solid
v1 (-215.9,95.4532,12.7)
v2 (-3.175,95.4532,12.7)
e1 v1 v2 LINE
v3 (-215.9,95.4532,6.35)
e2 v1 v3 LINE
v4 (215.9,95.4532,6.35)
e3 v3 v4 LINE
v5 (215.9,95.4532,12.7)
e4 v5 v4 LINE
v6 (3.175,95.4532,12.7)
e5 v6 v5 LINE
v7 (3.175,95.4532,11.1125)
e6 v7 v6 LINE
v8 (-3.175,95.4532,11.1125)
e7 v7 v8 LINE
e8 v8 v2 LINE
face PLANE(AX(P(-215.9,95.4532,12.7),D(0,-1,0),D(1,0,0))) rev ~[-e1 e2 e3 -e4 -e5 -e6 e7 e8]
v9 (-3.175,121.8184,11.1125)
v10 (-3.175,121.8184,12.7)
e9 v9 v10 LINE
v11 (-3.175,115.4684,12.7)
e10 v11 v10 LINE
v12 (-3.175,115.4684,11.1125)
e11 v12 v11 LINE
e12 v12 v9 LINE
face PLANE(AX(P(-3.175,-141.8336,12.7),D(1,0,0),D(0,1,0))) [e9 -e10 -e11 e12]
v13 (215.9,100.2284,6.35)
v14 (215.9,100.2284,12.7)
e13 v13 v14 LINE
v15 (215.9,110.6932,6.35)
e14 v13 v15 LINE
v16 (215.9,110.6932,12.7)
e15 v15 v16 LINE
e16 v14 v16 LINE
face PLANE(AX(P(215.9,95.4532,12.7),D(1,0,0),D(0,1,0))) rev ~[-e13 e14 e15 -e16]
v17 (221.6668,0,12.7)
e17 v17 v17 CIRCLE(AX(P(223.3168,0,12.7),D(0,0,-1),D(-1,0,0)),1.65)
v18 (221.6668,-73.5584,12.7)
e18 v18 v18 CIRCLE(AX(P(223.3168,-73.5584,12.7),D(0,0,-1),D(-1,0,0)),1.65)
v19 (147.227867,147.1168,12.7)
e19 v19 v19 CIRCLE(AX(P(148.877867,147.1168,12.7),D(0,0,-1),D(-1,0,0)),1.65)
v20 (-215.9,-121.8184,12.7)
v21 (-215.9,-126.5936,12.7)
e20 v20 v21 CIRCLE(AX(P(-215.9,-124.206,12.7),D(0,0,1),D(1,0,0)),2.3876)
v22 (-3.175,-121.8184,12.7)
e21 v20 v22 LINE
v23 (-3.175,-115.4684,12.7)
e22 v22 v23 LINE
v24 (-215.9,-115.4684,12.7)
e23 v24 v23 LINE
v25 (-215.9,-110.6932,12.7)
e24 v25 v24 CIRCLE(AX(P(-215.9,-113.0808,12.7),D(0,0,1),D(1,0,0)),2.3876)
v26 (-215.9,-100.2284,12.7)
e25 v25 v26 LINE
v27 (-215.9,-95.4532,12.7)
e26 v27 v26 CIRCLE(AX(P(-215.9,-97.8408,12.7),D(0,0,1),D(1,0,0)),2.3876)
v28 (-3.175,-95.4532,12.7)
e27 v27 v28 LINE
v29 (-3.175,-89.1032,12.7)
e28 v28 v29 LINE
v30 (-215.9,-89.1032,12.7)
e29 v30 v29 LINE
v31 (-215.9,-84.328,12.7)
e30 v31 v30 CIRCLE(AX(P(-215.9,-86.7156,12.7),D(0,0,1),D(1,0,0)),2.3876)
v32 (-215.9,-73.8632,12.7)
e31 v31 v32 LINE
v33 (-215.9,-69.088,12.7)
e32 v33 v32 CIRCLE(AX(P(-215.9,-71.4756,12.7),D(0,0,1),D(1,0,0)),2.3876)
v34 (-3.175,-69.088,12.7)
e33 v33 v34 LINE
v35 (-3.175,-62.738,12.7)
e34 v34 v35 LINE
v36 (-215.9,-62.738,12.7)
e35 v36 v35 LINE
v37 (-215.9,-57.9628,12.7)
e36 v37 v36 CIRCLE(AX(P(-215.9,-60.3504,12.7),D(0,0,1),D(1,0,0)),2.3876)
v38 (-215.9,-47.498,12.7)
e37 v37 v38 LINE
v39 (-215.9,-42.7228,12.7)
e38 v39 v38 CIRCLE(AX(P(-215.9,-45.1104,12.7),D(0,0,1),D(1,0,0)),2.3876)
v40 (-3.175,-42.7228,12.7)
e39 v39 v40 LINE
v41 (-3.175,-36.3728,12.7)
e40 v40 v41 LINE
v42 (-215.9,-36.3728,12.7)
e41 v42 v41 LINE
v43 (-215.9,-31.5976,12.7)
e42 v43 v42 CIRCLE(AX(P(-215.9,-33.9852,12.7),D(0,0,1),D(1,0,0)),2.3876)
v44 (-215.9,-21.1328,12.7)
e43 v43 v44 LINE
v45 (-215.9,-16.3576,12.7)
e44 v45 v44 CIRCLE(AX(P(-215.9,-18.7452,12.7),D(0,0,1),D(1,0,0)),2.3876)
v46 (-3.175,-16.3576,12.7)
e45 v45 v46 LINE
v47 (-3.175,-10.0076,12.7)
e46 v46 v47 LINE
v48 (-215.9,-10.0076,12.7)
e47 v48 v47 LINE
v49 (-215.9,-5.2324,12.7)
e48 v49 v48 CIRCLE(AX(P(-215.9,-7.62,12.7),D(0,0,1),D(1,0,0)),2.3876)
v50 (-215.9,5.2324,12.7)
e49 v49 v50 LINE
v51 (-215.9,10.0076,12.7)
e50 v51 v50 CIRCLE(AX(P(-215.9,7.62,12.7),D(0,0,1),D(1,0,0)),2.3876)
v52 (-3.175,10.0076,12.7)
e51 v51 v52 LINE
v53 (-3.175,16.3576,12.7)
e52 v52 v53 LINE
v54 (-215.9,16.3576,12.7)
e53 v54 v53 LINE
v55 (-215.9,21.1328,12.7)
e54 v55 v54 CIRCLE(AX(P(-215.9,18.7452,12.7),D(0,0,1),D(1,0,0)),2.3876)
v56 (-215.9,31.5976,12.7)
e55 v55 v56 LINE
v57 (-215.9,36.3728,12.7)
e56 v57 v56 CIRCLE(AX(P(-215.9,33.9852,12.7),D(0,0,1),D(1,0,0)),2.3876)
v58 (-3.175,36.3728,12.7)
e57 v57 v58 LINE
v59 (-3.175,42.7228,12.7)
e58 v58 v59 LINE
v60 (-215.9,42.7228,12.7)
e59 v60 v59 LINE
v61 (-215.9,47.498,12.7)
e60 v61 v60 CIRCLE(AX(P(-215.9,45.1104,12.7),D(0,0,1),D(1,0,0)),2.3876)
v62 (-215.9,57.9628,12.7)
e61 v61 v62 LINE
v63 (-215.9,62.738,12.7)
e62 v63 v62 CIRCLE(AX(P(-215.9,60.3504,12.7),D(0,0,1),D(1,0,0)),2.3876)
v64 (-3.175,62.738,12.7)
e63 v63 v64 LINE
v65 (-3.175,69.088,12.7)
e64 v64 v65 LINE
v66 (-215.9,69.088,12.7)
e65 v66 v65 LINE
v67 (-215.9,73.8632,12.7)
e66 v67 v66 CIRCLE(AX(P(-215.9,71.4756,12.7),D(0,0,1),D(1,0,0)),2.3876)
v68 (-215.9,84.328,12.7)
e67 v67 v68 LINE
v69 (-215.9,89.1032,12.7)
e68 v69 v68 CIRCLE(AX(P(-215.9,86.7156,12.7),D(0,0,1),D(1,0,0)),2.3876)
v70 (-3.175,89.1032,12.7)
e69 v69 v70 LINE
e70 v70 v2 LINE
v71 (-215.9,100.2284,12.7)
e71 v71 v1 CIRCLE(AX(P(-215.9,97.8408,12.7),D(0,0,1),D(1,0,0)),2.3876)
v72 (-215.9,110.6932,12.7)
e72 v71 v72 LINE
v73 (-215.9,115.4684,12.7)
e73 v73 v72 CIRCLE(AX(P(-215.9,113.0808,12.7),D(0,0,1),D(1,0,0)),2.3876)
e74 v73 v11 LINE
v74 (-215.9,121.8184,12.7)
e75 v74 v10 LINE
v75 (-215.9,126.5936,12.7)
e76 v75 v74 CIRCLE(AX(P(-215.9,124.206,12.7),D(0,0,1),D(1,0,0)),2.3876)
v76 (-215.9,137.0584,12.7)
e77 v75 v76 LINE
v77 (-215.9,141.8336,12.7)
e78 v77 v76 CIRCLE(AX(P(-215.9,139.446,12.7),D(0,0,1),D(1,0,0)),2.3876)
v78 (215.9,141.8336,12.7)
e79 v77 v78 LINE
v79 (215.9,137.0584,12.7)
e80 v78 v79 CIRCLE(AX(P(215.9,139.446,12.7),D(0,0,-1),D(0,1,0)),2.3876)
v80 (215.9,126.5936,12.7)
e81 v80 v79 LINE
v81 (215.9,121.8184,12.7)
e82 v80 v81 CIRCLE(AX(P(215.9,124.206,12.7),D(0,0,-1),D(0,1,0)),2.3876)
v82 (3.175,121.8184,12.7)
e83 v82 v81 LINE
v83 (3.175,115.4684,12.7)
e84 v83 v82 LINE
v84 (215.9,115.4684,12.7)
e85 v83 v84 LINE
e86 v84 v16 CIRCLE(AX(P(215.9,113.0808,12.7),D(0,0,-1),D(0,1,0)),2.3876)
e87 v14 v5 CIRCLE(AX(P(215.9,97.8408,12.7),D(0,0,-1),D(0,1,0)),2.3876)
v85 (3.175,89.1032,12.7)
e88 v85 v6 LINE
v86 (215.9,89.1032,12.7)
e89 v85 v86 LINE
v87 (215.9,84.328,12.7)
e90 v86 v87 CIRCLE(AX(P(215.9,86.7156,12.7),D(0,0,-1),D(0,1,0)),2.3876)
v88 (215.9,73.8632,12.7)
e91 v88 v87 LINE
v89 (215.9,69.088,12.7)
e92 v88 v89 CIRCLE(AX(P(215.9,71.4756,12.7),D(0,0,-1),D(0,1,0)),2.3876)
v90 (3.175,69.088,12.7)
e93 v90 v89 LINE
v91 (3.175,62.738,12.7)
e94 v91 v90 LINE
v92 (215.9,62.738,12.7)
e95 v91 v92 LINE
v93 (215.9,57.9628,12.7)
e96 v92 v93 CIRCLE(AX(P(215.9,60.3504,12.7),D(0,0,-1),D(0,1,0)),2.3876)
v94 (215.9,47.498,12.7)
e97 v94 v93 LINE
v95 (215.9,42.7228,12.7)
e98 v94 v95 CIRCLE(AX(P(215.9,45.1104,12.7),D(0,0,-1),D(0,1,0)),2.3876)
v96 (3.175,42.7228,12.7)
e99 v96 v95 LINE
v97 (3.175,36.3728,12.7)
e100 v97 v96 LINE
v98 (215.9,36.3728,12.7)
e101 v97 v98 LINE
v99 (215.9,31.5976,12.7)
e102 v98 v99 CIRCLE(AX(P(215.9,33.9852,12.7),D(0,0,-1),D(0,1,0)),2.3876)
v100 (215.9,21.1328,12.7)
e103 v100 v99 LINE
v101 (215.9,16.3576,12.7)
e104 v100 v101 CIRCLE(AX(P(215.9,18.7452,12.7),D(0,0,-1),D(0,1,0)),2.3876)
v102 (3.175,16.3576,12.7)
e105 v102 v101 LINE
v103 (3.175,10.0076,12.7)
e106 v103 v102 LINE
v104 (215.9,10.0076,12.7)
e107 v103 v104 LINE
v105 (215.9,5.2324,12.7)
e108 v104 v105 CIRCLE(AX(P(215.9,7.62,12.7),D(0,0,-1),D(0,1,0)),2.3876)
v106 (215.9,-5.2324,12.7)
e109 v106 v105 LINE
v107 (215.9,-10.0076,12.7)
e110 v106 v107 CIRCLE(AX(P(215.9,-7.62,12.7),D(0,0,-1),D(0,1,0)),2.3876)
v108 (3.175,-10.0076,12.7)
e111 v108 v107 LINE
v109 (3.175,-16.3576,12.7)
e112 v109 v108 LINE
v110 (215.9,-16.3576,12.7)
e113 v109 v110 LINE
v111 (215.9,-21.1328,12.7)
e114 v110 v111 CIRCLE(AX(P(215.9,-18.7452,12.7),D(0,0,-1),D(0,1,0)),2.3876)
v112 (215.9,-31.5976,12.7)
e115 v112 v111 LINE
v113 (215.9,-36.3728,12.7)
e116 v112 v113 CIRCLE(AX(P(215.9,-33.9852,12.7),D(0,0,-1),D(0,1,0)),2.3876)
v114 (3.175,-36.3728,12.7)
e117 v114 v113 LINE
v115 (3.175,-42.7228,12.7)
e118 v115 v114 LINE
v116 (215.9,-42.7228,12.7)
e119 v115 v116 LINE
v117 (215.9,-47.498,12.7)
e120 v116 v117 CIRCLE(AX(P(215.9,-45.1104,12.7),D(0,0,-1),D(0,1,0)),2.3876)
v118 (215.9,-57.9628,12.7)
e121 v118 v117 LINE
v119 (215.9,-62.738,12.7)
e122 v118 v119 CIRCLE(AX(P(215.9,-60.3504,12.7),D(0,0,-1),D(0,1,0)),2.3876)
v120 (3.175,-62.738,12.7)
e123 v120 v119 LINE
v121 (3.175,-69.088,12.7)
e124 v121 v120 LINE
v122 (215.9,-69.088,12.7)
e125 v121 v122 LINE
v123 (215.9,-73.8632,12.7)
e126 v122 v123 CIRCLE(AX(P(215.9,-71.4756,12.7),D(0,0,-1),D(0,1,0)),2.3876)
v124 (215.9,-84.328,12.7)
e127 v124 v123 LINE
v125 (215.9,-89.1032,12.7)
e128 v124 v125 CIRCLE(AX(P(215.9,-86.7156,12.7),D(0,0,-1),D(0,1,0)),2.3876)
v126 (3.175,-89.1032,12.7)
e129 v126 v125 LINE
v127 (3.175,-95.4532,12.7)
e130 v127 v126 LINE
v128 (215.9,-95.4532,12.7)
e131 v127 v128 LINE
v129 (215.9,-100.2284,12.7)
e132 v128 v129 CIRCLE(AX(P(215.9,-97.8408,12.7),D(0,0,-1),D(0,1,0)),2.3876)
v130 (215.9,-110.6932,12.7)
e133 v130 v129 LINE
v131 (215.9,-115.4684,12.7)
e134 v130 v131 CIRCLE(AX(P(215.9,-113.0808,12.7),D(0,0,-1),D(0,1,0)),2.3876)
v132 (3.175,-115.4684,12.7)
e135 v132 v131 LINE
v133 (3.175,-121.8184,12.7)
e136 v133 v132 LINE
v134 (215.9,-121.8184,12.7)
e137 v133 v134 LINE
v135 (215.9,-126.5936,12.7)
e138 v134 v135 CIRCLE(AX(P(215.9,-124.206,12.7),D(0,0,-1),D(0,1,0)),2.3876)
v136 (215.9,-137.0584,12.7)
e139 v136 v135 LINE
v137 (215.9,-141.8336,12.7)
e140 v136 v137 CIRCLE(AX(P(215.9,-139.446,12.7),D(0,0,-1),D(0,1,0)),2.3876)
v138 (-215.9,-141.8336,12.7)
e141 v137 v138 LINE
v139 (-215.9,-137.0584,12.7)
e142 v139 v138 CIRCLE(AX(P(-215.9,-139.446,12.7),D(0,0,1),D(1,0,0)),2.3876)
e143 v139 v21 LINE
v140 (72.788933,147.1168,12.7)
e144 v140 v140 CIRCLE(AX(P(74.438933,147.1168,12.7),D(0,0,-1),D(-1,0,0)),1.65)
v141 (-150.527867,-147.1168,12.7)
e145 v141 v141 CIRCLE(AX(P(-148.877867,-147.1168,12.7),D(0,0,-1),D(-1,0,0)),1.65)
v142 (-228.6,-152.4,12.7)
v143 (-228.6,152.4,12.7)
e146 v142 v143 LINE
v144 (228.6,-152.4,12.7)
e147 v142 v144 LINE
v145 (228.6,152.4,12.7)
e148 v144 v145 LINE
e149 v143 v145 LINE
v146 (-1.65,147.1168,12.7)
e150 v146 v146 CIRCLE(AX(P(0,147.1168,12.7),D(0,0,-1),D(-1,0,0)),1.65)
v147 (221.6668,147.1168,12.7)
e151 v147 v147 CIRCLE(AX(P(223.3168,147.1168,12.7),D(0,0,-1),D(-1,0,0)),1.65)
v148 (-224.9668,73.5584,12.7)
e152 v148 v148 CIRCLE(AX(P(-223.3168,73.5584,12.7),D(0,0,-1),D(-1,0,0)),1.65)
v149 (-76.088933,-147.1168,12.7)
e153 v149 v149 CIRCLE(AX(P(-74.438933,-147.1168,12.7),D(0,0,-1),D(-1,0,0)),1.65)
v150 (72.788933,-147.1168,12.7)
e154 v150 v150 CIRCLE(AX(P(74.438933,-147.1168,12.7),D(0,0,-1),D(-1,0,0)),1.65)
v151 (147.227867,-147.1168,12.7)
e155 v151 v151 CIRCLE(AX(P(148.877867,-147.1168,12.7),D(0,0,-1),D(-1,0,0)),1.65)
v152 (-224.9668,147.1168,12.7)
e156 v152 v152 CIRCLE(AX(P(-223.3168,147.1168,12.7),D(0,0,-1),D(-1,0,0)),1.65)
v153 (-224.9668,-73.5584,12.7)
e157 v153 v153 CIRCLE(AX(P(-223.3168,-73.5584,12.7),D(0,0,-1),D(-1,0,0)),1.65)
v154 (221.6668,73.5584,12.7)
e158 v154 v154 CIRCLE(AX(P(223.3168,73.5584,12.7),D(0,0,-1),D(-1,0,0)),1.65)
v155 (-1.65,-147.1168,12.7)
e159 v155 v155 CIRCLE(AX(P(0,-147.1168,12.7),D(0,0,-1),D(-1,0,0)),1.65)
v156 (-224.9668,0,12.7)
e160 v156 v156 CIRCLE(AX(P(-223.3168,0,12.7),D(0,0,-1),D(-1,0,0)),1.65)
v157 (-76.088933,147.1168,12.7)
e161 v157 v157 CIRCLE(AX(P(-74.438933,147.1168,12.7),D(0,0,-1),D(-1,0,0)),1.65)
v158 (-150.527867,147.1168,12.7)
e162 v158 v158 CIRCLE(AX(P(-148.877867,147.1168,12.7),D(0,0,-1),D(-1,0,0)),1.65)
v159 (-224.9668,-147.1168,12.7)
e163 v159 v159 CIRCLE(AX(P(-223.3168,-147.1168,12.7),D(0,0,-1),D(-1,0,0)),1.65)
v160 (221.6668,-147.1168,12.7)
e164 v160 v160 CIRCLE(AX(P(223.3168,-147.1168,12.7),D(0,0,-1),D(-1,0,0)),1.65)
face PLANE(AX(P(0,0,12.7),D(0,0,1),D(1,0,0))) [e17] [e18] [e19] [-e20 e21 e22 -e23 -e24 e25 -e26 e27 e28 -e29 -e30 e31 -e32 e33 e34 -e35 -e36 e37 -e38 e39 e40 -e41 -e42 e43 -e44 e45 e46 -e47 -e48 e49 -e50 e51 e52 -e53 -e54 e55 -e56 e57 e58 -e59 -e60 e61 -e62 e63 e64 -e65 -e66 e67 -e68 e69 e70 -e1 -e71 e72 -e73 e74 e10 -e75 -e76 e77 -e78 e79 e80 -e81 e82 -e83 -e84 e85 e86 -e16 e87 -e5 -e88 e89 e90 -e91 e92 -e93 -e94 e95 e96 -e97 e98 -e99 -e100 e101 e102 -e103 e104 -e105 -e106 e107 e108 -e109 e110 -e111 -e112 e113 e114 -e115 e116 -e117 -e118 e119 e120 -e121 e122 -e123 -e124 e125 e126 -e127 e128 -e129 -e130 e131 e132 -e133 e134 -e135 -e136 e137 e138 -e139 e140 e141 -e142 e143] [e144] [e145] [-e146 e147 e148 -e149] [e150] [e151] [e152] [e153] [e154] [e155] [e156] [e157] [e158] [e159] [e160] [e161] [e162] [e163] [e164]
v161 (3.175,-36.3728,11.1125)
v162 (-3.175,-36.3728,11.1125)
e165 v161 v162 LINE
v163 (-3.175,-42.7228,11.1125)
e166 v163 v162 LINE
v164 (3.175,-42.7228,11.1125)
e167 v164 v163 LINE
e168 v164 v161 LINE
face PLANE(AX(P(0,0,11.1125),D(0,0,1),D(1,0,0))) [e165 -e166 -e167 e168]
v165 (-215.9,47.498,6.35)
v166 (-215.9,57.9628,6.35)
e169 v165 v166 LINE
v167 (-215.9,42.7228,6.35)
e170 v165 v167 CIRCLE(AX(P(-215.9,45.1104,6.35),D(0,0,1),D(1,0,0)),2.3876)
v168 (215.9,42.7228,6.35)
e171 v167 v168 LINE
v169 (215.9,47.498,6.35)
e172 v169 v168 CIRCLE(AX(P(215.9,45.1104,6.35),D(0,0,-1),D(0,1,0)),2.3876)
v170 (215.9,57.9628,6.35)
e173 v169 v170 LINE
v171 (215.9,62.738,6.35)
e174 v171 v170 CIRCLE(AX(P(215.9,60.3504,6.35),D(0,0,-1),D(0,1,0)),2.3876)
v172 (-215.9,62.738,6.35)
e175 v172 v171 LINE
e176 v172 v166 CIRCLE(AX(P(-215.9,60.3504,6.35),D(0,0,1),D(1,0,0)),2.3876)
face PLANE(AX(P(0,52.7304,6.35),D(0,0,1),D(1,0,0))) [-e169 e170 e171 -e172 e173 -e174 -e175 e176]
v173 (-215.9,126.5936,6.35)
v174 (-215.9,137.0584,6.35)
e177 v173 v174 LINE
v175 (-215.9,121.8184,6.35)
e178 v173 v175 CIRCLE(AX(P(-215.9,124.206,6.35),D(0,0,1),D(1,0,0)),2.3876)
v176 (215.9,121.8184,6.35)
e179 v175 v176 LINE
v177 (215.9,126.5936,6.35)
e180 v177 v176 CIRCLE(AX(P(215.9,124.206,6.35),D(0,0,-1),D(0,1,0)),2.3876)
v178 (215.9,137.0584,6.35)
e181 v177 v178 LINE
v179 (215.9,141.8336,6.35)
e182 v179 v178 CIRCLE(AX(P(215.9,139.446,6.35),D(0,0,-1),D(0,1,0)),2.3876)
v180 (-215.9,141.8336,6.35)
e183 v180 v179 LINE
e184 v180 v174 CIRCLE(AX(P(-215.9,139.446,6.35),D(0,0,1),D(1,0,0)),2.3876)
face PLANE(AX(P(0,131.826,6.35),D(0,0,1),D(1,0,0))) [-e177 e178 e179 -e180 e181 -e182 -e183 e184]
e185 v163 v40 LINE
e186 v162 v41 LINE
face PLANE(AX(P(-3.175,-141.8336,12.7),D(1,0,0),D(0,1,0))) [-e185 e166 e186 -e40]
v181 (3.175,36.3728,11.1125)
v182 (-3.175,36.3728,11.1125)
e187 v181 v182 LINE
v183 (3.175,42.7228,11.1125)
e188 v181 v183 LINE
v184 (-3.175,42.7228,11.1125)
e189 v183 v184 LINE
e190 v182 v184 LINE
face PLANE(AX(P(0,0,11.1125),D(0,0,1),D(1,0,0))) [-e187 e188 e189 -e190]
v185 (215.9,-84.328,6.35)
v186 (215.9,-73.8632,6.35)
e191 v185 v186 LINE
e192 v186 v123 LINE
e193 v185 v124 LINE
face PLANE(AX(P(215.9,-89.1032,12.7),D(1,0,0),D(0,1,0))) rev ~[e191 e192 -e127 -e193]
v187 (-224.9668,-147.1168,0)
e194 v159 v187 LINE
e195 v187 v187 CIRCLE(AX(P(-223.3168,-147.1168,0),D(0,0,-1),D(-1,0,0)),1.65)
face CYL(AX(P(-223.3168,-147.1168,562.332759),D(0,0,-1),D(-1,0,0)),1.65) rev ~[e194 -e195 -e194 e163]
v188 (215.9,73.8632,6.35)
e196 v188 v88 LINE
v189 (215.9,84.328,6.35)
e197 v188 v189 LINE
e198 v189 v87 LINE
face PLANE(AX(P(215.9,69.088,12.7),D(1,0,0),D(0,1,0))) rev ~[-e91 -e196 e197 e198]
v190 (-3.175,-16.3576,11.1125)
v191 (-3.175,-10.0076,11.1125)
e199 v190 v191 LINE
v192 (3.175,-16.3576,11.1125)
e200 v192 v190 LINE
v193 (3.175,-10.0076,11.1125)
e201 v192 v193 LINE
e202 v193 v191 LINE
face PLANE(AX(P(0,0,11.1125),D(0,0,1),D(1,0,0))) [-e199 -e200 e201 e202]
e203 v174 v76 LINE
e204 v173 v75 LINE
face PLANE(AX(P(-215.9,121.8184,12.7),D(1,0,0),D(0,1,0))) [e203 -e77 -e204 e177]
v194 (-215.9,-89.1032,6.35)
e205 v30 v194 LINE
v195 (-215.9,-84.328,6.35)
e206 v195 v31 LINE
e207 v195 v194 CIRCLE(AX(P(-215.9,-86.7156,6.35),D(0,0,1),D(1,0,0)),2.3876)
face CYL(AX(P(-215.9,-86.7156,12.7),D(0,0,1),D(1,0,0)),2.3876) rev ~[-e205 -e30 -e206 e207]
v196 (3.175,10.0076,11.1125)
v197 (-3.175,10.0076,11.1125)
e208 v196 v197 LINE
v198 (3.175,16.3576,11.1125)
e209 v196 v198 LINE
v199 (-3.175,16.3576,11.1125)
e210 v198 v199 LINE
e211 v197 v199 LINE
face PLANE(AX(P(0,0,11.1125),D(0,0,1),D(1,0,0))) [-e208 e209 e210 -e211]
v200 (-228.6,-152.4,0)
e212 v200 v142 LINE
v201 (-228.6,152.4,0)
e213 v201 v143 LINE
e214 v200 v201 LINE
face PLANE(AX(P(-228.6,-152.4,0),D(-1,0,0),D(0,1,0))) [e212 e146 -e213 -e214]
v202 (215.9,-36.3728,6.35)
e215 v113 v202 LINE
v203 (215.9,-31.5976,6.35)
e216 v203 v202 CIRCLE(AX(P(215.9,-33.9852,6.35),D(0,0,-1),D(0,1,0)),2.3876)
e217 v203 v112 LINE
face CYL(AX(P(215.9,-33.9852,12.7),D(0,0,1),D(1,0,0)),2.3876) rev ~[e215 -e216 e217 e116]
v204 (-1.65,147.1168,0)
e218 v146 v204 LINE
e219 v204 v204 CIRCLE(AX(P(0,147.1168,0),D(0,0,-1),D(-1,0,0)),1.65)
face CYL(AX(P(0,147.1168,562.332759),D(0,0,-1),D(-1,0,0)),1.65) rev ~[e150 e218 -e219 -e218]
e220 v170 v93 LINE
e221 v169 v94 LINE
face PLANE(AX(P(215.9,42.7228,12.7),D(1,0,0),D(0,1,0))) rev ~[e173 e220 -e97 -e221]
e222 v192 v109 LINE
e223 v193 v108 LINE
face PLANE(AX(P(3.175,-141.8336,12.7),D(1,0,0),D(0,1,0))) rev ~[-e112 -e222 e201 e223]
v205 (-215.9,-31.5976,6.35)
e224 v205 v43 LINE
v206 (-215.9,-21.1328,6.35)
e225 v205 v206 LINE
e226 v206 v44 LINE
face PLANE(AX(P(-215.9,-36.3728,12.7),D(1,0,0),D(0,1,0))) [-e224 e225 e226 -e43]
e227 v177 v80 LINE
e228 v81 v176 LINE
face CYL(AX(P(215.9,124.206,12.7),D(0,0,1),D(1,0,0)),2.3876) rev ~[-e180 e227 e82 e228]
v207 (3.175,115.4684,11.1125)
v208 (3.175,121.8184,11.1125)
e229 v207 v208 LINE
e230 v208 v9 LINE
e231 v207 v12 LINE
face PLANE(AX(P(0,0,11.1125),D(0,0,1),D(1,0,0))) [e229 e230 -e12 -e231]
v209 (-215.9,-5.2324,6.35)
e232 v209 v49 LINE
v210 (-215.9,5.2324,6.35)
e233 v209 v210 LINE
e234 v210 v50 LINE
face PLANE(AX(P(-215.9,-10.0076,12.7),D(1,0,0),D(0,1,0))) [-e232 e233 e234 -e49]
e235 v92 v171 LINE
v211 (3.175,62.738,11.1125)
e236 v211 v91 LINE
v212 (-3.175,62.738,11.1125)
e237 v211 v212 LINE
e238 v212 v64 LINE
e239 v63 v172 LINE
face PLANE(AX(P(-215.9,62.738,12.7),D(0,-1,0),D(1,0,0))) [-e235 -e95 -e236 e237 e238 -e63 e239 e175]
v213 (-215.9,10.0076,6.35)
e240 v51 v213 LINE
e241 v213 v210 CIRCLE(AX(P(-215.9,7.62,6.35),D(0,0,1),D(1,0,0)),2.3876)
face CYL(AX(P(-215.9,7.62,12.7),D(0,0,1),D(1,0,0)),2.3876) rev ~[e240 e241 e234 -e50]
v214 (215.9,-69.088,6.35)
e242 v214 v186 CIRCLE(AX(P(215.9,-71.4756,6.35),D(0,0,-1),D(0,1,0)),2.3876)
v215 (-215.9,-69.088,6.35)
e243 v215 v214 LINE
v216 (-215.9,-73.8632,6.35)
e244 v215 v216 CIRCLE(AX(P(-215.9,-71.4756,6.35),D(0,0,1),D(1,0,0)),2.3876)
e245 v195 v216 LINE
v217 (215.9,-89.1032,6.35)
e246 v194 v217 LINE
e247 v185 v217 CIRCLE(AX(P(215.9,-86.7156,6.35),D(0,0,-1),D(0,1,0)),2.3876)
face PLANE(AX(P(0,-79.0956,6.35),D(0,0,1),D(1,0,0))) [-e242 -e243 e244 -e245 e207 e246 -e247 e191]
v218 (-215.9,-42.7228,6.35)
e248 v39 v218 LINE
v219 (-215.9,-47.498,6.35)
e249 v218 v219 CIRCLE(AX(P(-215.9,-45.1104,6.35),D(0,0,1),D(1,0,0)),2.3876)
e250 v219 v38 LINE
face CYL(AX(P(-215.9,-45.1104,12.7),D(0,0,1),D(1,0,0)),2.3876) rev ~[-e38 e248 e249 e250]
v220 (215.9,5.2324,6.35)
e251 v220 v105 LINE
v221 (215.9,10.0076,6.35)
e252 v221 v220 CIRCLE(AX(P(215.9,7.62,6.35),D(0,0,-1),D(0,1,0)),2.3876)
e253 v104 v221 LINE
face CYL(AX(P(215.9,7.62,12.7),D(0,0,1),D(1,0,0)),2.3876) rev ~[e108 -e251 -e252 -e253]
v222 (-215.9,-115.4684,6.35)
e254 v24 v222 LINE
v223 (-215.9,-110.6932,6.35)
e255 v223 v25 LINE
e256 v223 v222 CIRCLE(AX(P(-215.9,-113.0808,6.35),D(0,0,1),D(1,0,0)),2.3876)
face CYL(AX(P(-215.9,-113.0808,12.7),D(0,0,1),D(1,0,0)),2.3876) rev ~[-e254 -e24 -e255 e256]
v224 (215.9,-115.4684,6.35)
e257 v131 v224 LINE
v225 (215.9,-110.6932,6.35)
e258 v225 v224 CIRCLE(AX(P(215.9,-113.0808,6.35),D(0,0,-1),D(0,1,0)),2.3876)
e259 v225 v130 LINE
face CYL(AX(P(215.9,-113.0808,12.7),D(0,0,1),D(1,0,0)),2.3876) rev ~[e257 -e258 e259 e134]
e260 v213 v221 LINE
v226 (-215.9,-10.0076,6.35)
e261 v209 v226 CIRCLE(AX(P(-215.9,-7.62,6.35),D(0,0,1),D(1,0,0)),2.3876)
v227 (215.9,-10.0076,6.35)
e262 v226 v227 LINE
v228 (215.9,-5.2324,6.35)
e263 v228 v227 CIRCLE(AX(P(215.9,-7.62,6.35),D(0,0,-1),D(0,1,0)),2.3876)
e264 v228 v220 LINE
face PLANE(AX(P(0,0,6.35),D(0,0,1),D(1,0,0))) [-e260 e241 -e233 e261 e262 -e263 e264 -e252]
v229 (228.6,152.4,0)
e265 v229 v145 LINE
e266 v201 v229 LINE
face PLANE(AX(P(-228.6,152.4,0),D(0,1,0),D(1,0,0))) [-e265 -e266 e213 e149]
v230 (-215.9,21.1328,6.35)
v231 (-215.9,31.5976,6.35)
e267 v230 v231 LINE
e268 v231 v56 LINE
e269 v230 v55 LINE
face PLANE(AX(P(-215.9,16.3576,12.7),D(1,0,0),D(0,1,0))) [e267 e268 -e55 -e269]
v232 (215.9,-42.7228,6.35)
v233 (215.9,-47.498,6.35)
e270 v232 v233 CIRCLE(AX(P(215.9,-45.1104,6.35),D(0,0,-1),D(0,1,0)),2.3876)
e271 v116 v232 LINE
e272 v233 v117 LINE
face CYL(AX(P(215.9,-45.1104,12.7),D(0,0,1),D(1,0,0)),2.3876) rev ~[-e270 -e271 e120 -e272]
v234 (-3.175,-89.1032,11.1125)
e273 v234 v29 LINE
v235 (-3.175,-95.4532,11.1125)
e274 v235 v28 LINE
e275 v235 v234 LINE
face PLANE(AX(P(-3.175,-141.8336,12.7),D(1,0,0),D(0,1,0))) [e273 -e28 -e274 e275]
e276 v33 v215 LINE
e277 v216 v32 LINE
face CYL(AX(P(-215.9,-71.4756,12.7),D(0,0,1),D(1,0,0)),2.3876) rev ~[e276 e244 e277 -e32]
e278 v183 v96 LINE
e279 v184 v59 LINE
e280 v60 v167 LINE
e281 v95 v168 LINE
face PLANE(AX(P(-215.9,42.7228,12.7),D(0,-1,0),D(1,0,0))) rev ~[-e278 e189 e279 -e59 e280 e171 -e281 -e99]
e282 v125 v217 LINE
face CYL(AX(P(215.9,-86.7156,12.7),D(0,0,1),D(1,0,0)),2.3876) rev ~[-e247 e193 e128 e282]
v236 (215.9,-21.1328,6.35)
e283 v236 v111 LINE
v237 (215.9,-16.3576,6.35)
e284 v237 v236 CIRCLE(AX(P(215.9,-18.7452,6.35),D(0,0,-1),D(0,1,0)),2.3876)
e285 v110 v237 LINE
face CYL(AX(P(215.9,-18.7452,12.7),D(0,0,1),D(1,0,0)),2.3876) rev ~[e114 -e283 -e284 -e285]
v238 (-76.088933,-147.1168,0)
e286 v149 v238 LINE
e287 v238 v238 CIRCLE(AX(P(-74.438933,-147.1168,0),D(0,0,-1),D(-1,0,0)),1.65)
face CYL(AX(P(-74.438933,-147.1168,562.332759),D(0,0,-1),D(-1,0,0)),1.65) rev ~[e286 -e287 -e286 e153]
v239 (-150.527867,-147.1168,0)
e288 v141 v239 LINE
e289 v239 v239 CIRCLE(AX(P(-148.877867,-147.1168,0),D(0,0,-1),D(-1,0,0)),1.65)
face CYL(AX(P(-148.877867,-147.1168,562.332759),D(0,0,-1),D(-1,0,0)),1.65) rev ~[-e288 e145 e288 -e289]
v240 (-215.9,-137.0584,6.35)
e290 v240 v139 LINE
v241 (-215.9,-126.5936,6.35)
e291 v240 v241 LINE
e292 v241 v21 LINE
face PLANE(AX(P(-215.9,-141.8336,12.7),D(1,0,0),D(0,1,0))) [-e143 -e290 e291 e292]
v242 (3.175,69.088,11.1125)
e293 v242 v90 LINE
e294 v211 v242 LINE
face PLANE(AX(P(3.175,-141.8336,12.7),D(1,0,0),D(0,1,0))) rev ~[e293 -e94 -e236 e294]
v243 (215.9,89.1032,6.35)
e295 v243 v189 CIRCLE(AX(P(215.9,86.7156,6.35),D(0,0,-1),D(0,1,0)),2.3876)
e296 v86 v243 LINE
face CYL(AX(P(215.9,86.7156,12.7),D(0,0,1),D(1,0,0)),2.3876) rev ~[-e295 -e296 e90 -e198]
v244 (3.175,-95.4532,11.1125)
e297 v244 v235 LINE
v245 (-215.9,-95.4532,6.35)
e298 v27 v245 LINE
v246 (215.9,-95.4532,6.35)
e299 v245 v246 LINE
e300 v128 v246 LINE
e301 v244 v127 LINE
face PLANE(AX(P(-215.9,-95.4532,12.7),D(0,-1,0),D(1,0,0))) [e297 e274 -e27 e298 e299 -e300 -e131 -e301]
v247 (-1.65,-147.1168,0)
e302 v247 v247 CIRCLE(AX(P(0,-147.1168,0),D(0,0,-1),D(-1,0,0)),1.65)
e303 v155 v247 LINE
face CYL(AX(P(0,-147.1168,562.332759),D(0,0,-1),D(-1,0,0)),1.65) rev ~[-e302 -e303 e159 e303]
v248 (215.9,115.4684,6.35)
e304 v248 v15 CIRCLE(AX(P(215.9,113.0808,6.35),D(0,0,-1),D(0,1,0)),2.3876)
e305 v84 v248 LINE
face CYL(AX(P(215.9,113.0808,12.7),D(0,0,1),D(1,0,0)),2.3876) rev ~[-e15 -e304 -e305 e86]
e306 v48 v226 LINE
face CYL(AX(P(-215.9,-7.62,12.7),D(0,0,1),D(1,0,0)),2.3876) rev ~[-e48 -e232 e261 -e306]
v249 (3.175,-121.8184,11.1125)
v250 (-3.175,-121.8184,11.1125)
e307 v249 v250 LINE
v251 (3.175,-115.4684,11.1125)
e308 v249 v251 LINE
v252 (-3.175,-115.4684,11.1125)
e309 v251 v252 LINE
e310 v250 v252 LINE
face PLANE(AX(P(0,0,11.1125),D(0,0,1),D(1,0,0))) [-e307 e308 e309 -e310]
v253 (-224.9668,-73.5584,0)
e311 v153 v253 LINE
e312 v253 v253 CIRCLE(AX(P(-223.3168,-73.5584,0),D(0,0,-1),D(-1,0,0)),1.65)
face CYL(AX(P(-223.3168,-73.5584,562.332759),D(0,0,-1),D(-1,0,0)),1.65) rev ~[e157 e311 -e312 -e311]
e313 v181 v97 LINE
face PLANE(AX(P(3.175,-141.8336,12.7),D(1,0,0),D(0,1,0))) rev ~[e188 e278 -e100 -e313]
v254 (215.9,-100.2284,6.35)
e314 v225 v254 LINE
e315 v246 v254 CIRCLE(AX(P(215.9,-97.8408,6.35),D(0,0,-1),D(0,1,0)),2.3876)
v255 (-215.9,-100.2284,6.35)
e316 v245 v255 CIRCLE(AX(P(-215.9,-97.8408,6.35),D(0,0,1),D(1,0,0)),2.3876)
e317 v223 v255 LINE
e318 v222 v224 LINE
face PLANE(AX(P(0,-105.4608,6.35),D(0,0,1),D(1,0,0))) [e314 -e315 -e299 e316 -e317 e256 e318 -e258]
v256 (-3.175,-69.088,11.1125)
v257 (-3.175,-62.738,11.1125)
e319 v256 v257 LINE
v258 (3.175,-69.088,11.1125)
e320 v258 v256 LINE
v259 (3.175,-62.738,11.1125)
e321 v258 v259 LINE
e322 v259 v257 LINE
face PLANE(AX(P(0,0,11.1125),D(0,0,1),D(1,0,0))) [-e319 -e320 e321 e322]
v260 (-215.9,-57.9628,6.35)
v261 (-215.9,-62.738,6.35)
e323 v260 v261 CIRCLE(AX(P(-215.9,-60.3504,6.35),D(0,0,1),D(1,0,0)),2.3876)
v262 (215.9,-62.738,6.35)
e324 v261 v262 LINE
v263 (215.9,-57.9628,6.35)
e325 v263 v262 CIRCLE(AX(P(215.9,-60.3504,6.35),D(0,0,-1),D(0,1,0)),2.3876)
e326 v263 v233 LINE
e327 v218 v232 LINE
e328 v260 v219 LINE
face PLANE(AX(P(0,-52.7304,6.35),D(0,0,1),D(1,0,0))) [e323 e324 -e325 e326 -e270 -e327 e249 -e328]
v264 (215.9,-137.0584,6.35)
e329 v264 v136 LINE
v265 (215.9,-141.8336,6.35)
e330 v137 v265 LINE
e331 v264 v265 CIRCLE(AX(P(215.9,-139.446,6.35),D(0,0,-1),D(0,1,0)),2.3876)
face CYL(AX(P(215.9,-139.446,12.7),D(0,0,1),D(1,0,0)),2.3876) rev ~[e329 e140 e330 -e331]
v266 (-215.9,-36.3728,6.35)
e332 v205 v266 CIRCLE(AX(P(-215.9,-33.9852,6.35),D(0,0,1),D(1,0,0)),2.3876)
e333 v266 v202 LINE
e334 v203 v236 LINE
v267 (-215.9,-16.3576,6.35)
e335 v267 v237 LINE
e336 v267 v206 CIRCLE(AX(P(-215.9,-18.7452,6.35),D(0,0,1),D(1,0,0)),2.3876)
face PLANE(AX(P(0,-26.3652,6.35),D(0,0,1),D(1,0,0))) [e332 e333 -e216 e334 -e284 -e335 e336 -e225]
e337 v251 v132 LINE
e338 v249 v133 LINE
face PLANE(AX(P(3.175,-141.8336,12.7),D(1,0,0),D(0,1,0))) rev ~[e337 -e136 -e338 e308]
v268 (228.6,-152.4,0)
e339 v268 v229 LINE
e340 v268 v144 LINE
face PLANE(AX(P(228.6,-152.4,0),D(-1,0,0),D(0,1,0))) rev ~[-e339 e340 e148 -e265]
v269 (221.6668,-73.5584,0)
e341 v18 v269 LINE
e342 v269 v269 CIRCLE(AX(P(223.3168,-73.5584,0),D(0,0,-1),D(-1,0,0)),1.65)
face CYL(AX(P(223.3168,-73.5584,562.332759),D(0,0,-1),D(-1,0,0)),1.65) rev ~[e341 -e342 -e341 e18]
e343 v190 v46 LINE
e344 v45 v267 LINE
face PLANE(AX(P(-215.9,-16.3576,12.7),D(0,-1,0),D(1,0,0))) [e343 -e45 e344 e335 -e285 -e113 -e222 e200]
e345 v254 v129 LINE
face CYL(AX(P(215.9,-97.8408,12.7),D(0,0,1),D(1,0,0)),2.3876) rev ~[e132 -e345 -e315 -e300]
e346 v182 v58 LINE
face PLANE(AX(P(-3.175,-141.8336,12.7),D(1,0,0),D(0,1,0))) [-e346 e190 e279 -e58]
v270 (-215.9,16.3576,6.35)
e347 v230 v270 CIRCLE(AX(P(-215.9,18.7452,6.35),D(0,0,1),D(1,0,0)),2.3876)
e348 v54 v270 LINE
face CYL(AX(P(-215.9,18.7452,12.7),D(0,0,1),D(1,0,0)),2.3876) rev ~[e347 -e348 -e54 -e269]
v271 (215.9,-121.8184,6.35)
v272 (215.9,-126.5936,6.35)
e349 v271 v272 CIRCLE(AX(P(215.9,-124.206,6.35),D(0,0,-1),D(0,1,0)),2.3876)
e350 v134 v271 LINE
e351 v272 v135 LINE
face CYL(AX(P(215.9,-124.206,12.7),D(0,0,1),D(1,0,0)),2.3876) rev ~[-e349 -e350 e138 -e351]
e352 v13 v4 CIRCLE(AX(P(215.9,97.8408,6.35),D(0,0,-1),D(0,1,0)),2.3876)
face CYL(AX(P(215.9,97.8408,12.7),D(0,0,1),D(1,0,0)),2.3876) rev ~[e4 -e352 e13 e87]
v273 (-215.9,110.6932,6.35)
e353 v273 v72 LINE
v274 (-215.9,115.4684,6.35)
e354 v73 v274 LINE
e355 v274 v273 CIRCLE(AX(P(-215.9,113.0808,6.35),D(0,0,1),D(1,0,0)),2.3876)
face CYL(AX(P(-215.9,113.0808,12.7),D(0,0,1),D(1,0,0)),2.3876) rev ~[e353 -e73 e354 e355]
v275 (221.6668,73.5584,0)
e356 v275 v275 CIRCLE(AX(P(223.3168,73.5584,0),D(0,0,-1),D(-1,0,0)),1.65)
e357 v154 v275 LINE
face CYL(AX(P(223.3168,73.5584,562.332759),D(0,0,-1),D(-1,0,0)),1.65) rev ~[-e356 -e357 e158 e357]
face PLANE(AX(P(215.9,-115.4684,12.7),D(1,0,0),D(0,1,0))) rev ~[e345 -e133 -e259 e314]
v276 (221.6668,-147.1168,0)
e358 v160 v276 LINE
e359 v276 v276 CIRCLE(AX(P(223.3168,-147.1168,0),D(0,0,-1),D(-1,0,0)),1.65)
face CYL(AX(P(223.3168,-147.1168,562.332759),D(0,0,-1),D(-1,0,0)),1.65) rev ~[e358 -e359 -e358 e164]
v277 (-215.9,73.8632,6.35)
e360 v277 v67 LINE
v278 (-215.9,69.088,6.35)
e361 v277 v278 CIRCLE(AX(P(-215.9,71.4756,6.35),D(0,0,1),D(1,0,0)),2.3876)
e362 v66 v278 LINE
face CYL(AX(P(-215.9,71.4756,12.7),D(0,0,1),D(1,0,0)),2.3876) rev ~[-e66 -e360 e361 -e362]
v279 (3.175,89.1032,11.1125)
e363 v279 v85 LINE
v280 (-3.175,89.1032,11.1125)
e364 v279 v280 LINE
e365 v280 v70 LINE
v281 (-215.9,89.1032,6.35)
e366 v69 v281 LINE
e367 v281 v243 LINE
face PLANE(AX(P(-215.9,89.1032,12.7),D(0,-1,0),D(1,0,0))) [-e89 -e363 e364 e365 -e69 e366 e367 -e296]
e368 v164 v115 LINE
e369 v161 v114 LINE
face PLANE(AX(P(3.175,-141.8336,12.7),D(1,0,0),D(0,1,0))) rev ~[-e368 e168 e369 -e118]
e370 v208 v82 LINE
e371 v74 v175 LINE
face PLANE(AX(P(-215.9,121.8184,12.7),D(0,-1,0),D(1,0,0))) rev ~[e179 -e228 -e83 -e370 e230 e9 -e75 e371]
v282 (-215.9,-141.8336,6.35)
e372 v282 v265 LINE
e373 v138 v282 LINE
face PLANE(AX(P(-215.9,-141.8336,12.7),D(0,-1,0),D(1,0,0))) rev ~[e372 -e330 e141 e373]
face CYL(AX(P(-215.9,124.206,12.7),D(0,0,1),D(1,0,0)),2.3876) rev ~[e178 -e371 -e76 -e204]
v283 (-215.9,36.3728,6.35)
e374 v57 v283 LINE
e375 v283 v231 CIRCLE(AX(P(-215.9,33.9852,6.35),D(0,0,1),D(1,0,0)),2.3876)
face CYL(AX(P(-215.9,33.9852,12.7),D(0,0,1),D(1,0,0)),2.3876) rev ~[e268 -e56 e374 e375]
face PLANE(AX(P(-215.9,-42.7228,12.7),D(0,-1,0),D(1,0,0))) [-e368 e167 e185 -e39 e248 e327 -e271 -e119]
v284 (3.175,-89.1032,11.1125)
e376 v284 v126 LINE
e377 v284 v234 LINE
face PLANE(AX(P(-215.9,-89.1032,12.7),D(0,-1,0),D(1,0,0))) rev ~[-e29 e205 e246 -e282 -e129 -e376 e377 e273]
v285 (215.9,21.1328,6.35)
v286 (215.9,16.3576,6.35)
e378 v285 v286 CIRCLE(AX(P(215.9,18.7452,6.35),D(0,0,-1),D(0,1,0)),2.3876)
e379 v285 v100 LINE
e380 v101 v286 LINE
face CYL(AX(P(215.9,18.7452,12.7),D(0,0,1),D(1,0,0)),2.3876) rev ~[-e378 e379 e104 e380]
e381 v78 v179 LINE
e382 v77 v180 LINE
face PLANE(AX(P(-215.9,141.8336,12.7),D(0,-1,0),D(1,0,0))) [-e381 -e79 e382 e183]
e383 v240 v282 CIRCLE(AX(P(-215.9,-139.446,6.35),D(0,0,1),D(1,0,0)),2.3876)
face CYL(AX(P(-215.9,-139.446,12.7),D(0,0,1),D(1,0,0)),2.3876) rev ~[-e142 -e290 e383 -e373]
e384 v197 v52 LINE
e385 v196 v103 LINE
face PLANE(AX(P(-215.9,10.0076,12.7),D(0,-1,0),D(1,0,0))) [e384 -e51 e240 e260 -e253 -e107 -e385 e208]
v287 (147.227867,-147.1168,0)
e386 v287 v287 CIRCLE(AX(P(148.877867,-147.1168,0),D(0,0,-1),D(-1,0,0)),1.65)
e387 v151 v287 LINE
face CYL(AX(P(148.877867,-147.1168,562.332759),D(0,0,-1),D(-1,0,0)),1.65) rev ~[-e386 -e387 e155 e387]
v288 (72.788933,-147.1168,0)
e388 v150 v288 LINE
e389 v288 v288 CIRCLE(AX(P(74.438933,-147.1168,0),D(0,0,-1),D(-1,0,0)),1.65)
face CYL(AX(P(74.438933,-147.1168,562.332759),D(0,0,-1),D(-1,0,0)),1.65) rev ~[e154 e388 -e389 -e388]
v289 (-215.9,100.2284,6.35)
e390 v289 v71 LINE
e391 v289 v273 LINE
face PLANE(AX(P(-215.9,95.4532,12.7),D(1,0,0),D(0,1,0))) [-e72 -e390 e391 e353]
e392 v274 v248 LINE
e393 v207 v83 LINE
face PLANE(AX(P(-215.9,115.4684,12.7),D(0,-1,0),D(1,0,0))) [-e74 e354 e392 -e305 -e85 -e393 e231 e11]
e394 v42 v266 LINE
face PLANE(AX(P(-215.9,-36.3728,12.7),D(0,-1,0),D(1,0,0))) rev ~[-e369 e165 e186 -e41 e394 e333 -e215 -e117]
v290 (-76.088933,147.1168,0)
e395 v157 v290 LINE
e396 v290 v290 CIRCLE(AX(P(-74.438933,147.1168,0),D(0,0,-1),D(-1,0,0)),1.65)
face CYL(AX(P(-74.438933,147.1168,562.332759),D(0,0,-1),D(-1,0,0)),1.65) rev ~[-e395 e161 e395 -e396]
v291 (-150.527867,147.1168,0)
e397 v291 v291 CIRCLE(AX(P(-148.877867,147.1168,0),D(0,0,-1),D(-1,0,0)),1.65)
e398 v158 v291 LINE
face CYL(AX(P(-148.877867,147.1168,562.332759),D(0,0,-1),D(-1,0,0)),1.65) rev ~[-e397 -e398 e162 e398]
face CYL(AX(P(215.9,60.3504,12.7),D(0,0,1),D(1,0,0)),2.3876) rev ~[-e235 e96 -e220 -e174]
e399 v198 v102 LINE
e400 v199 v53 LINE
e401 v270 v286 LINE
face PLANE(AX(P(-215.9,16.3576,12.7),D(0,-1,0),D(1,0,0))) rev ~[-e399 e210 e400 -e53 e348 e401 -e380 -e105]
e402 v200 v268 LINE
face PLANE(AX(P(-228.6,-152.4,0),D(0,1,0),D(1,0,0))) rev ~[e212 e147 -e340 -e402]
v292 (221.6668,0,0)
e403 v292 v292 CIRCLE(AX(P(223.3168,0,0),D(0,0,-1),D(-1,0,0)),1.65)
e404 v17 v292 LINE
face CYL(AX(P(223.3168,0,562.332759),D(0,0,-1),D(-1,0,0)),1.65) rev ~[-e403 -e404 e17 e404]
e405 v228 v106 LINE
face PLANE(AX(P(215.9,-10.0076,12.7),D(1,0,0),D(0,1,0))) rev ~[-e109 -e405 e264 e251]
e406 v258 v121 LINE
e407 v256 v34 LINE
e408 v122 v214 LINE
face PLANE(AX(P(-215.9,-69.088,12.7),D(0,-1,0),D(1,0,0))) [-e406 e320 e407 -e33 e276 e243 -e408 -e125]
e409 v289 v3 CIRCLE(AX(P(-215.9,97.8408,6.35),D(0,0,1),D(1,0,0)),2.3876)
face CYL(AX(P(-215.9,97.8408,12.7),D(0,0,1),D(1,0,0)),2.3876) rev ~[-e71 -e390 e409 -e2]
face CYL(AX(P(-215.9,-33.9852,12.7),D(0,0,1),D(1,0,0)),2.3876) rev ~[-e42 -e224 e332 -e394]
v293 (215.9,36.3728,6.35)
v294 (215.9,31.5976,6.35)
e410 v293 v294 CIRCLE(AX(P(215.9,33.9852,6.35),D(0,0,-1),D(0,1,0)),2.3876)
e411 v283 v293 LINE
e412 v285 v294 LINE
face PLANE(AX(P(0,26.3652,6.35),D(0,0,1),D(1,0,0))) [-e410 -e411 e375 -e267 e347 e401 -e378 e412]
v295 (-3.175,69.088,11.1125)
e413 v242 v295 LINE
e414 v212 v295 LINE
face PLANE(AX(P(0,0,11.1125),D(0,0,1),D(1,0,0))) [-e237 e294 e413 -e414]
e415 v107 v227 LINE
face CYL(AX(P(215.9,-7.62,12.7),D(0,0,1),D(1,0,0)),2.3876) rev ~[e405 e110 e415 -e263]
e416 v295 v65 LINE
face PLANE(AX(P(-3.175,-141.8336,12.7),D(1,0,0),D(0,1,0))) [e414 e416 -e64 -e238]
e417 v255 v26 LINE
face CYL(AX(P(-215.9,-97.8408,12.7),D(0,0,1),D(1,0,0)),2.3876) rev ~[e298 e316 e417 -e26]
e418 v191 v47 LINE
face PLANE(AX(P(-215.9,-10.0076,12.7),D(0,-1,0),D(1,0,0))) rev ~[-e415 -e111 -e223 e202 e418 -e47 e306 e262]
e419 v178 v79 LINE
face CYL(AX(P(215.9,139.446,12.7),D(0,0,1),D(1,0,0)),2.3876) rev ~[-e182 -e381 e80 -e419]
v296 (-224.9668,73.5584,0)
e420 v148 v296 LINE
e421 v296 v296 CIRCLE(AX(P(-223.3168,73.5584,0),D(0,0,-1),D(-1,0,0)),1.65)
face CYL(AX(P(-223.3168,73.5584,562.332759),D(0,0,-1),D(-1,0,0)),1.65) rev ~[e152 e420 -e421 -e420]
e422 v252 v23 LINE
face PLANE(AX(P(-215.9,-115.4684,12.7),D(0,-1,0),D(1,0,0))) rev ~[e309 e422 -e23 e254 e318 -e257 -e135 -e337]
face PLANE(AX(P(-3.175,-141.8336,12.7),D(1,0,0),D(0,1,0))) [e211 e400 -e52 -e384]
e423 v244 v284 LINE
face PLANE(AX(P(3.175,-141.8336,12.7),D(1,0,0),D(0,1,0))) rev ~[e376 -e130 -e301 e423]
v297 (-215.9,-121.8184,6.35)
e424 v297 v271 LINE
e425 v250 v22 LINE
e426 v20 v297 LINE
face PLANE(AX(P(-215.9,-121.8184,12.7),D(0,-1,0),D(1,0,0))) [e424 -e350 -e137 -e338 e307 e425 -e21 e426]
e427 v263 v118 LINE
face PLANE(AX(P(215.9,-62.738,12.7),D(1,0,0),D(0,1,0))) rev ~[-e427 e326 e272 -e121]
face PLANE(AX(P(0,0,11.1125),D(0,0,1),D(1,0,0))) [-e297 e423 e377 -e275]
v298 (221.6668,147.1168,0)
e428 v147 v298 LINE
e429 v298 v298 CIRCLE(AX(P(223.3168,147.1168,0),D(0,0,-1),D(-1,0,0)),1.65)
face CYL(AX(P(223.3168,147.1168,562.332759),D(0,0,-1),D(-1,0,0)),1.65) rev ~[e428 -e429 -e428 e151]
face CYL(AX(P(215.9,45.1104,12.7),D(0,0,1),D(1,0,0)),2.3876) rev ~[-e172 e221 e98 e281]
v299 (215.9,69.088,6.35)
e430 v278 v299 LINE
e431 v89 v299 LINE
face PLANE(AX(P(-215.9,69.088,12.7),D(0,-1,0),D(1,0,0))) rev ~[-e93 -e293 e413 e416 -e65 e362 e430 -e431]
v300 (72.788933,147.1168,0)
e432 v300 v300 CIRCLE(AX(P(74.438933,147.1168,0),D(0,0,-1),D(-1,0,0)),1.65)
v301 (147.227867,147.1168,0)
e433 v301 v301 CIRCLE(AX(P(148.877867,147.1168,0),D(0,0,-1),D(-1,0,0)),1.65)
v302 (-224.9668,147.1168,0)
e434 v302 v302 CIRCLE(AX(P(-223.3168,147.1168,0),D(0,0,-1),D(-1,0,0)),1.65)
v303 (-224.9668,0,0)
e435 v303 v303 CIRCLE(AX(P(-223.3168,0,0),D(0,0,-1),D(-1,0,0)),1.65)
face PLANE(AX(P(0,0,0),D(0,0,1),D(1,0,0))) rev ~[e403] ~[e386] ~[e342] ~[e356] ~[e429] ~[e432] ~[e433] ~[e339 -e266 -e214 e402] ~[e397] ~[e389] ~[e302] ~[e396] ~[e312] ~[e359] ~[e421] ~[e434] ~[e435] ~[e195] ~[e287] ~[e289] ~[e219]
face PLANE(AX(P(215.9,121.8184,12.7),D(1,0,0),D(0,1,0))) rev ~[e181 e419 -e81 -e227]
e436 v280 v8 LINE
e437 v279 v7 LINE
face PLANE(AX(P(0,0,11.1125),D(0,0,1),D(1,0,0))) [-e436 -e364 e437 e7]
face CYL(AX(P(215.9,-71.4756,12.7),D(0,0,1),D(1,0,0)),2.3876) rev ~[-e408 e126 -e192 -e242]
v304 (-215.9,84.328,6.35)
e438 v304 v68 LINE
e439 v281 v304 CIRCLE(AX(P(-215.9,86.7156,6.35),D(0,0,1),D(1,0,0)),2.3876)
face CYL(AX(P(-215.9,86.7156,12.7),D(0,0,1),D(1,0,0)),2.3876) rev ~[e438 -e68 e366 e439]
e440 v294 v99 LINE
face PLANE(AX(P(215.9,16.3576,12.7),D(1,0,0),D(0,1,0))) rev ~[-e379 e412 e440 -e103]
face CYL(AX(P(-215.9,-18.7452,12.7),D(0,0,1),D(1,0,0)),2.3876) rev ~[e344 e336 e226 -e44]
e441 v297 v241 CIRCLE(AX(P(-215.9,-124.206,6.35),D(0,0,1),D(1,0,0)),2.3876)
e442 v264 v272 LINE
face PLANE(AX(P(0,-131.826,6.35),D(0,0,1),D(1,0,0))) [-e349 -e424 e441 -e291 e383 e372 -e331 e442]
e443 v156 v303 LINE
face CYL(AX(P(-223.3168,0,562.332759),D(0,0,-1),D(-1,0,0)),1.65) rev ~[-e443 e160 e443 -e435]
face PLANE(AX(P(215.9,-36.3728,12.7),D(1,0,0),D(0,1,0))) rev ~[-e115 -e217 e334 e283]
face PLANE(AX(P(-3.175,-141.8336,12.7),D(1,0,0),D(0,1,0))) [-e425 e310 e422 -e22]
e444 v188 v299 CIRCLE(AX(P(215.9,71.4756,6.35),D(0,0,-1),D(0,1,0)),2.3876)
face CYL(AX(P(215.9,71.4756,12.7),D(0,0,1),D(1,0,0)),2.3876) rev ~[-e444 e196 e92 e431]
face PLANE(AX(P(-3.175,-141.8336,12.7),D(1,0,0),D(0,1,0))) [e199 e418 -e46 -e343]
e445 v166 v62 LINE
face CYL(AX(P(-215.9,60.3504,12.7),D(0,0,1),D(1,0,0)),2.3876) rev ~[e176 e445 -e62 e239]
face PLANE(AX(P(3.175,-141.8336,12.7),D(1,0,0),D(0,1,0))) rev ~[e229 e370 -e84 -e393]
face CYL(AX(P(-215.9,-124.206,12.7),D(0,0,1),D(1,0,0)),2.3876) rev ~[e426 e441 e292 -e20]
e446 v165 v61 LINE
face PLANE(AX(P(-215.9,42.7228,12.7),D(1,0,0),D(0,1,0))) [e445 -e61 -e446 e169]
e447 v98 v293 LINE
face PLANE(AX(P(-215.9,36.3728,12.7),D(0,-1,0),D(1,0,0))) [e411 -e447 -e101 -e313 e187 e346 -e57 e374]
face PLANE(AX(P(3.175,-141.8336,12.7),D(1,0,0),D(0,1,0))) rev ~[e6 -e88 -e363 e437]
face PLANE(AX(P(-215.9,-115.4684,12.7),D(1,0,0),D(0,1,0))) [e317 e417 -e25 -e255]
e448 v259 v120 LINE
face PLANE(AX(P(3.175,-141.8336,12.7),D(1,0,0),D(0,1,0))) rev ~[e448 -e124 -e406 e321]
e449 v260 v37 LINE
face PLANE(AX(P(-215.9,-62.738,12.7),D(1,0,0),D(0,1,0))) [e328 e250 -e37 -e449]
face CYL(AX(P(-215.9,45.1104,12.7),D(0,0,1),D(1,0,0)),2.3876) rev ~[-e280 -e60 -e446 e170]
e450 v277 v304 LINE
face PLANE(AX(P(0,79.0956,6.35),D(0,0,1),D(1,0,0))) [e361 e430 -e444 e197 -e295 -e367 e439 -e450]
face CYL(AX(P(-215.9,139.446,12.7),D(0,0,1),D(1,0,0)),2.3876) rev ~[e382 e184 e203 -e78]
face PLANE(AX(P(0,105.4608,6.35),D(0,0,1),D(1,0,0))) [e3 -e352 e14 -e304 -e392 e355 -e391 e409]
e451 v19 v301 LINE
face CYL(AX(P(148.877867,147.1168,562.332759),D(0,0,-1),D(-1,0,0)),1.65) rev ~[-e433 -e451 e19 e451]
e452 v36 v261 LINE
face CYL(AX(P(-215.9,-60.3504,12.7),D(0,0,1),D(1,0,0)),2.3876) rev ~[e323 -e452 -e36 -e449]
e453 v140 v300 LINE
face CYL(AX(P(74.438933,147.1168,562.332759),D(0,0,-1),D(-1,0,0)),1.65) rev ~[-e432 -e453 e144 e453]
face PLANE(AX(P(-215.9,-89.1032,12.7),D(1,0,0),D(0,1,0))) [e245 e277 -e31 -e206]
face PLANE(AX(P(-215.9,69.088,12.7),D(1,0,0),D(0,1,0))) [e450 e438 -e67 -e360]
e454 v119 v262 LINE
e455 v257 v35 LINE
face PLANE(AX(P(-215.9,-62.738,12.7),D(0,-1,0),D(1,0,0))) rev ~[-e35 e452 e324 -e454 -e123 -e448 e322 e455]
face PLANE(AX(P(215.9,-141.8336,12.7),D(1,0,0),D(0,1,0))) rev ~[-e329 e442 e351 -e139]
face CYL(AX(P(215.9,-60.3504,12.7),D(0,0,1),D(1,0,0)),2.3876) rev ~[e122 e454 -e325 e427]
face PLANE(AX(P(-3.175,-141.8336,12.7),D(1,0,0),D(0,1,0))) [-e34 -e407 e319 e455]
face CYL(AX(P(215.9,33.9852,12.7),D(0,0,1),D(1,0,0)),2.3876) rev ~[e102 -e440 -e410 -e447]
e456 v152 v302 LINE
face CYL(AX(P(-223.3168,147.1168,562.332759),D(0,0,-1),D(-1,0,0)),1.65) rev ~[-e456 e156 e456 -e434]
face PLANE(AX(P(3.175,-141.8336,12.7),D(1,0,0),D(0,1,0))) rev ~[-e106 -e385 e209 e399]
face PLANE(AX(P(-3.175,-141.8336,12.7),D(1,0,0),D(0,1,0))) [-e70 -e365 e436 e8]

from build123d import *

# Parameters (mm, degrees)
F2_W      = 457.2
F2_H      = 304.8
F3_DEPTH  = 12.7
F4_W      = 431.8
F4_H      = 20.0152
F5_DEPTH  = 6.35
F7_D      = 3.3
F8_R      = 2.3876
F9_DEPTH  = 6.35
F10_W     = 6.35
F10_H     = 283.6672
F11_DEPTH = 1.5875


# Not quite as in the source:
# - a variable given as a bare number and used for a length is read in inches; the dataset says mm whatever the document's units were


with BuildPart() as f3:
    # F2 (on Top) → F3 (new body)
    with BuildSketch(Plane.XY):
        Rectangle(F2_W, F2_H)
    extrude(amount=F3_DEPTH)

    # F4 (on face) → F5 (cut)
    with BuildSketch(Plane.XY.offset(12.7)):
        with Locations((0, 131.826)):
            Rectangle(F4_W, F4_H)
        with Locations((0, 105.4608)):
            Rectangle(F4_W, F4_H)
        with Locations((0, 79.0956)):
            Rectangle(F4_W, F4_H)
        with Locations((0, 52.7304)):
            Rectangle(F4_W, F4_H)
        with Locations((0, 26.3652)):
            Rectangle(F4_W, F4_H)
        Rectangle(F4_W, F4_H)
        with Locations((0, -26.3652)):
            Rectangle(F4_W, F4_H)
        with Locations((0, -52.7304)):
            Rectangle(F4_W, F4_H)
        with Locations((0, -79.0956)):
            Rectangle(F4_W, F4_H)
        with Locations((0, -105.4608)):
            Rectangle(F4_W, F4_H)
        with Locations((0, -131.826)):
            Rectangle(F4_W, F4_H)
    extrude(amount=-F5_DEPTH, mode=Mode.SUBTRACT)

    # F7 (through all)
    with Locations(Plane.XY.offset(12.7)):
        with Locations((-223.3168, 147.1168), (-223.3168, 73.5584), (-223.3168, 0), (-223.3168, -73.5584), (-223.3168, -147.1168), (-148.8778666667, -147.1168), (-74.4389333333, -147.1168), (0, -147.1168), (74.4389333333, -147.1168), (148.8778666667, -147.1168), (223.3168, -147.1168), (223.3168, -73.5584), (223.3168, 0), (223.3168, 73.5584), (223.3168, 147.1168), (148.8778666667, 147.1168), (74.4389333333, 147.1168), (0, 147.1168), (-74.4389333333, 147.1168), (-148.8778666667, 147.1168)):
            Hole(F7_D / 2)

    # F8 (on face) → F9 (cut)
    with BuildSketch(Plane.XY.offset(12.7)):
        with Locations((-215.9, 33.9852)):
            Circle(F8_R)
        with Locations((-215.9, 45.1104)):
            Circle(F8_R)
        with Locations((-215.9, 60.3504)):
            Circle(F8_R)
        with Locations((-215.9, 86.7156)):
            Circle(F8_R)
        with Locations((-215.9, 71.4756)):
            Circle(F8_R)
        with Locations((-215.9, 97.8408)):
            Circle(F8_R)
        with Locations((-215.9, 113.0808)):
            Circle(F8_R)
        with Locations((-215.9, 124.206)):
            Circle(F8_R)
        with Locations((-215.9, 139.446)):
            Circle(F8_R)
        with Locations((-215.9, 18.7452)):
            Circle(F8_R)
        with Locations((-215.9, 7.62)):
            Circle(F8_R)
        with Locations((215.9, 7.62)):
            Circle(F8_R)
        with Locations((215.9, 18.7452)):
            Circle(F8_R)
        with Locations((215.9, 33.9852)):
            Circle(F8_R)
        with Locations((215.9, 45.1104)):
            Circle(F8_R)
        with Locations((215.9, 60.3504)):
            Circle(F8_R)
        with Locations((215.9, 71.4756)):
            Circle(F8_R)
        with Locations((215.9, 86.7156)):
            Circle(F8_R)
        with Locations((215.9, 97.8408)):
            Circle(F8_R)
        with Locations((215.9, 113.0808)):
            Circle(F8_R)
        with Locations((215.9, 124.206)):
            Circle(F8_R)
        with Locations((215.9, 139.446)):
            Circle(F8_R)
        with Locations((215.9, -7.62)):
            Circle(F8_R)
        with Locations((215.9, -18.7452)):
            Circle(F8_R)
        with Locations((215.9, -33.9852)):
            Circle(F8_R)
        with Locations((215.9, -45.1104)):
            Circle(F8_R)
        with Locations((215.9, -60.3504)):
            Circle(F8_R)
        with Locations((215.9, -71.4756)):
            Circle(F8_R)
        with Locations((215.9, -86.7156)):
            Circle(F8_R)
        with Locations((215.9, -97.8408)):
            Circle(F8_R)
        with Locations((215.9, -113.0808)):
            Circle(F8_R)
        with Locations((215.9, -124.206)):
            Circle(F8_R)
        with Locations((215.9, -139.446)):
            Circle(F8_R)
        with Locations((-215.9, -7.62)):
            Circle(F8_R)
        with Locations((-215.9, -18.7452)):
            Circle(F8_R)
        with Locations((-215.9, -33.9852)):
            Circle(F8_R)
        with Locations((-215.9, -45.1104)):
            Circle(F8_R)
        with Locations((-215.9, -60.3504)):
            Circle(F8_R)
        with Locations((-215.9, -71.4756)):
            Circle(F8_R)
        with Locations((-215.9, -97.8408)):
            Circle(F8_R)
        with Locations((-215.9, -86.7156)):
            Circle(F8_R)
        with Locations((-215.9, -139.446)):
            Circle(F8_R)
        with Locations((-215.9, -124.206)):
            Circle(F8_R)
        with Locations((-215.9, -113.0808)):
            Circle(F8_R)
    extrude(amount=-F9_DEPTH, mode=Mode.SUBTRACT)

    # F10 (on face) → F11 (cut)
    with BuildSketch(Plane.XY.offset(12.7)):
        Rectangle(F10_W, F10_H)
    extrude(amount=-F11_DEPTH, mode=Mode.SUBTRACT)


solid = f3.part
